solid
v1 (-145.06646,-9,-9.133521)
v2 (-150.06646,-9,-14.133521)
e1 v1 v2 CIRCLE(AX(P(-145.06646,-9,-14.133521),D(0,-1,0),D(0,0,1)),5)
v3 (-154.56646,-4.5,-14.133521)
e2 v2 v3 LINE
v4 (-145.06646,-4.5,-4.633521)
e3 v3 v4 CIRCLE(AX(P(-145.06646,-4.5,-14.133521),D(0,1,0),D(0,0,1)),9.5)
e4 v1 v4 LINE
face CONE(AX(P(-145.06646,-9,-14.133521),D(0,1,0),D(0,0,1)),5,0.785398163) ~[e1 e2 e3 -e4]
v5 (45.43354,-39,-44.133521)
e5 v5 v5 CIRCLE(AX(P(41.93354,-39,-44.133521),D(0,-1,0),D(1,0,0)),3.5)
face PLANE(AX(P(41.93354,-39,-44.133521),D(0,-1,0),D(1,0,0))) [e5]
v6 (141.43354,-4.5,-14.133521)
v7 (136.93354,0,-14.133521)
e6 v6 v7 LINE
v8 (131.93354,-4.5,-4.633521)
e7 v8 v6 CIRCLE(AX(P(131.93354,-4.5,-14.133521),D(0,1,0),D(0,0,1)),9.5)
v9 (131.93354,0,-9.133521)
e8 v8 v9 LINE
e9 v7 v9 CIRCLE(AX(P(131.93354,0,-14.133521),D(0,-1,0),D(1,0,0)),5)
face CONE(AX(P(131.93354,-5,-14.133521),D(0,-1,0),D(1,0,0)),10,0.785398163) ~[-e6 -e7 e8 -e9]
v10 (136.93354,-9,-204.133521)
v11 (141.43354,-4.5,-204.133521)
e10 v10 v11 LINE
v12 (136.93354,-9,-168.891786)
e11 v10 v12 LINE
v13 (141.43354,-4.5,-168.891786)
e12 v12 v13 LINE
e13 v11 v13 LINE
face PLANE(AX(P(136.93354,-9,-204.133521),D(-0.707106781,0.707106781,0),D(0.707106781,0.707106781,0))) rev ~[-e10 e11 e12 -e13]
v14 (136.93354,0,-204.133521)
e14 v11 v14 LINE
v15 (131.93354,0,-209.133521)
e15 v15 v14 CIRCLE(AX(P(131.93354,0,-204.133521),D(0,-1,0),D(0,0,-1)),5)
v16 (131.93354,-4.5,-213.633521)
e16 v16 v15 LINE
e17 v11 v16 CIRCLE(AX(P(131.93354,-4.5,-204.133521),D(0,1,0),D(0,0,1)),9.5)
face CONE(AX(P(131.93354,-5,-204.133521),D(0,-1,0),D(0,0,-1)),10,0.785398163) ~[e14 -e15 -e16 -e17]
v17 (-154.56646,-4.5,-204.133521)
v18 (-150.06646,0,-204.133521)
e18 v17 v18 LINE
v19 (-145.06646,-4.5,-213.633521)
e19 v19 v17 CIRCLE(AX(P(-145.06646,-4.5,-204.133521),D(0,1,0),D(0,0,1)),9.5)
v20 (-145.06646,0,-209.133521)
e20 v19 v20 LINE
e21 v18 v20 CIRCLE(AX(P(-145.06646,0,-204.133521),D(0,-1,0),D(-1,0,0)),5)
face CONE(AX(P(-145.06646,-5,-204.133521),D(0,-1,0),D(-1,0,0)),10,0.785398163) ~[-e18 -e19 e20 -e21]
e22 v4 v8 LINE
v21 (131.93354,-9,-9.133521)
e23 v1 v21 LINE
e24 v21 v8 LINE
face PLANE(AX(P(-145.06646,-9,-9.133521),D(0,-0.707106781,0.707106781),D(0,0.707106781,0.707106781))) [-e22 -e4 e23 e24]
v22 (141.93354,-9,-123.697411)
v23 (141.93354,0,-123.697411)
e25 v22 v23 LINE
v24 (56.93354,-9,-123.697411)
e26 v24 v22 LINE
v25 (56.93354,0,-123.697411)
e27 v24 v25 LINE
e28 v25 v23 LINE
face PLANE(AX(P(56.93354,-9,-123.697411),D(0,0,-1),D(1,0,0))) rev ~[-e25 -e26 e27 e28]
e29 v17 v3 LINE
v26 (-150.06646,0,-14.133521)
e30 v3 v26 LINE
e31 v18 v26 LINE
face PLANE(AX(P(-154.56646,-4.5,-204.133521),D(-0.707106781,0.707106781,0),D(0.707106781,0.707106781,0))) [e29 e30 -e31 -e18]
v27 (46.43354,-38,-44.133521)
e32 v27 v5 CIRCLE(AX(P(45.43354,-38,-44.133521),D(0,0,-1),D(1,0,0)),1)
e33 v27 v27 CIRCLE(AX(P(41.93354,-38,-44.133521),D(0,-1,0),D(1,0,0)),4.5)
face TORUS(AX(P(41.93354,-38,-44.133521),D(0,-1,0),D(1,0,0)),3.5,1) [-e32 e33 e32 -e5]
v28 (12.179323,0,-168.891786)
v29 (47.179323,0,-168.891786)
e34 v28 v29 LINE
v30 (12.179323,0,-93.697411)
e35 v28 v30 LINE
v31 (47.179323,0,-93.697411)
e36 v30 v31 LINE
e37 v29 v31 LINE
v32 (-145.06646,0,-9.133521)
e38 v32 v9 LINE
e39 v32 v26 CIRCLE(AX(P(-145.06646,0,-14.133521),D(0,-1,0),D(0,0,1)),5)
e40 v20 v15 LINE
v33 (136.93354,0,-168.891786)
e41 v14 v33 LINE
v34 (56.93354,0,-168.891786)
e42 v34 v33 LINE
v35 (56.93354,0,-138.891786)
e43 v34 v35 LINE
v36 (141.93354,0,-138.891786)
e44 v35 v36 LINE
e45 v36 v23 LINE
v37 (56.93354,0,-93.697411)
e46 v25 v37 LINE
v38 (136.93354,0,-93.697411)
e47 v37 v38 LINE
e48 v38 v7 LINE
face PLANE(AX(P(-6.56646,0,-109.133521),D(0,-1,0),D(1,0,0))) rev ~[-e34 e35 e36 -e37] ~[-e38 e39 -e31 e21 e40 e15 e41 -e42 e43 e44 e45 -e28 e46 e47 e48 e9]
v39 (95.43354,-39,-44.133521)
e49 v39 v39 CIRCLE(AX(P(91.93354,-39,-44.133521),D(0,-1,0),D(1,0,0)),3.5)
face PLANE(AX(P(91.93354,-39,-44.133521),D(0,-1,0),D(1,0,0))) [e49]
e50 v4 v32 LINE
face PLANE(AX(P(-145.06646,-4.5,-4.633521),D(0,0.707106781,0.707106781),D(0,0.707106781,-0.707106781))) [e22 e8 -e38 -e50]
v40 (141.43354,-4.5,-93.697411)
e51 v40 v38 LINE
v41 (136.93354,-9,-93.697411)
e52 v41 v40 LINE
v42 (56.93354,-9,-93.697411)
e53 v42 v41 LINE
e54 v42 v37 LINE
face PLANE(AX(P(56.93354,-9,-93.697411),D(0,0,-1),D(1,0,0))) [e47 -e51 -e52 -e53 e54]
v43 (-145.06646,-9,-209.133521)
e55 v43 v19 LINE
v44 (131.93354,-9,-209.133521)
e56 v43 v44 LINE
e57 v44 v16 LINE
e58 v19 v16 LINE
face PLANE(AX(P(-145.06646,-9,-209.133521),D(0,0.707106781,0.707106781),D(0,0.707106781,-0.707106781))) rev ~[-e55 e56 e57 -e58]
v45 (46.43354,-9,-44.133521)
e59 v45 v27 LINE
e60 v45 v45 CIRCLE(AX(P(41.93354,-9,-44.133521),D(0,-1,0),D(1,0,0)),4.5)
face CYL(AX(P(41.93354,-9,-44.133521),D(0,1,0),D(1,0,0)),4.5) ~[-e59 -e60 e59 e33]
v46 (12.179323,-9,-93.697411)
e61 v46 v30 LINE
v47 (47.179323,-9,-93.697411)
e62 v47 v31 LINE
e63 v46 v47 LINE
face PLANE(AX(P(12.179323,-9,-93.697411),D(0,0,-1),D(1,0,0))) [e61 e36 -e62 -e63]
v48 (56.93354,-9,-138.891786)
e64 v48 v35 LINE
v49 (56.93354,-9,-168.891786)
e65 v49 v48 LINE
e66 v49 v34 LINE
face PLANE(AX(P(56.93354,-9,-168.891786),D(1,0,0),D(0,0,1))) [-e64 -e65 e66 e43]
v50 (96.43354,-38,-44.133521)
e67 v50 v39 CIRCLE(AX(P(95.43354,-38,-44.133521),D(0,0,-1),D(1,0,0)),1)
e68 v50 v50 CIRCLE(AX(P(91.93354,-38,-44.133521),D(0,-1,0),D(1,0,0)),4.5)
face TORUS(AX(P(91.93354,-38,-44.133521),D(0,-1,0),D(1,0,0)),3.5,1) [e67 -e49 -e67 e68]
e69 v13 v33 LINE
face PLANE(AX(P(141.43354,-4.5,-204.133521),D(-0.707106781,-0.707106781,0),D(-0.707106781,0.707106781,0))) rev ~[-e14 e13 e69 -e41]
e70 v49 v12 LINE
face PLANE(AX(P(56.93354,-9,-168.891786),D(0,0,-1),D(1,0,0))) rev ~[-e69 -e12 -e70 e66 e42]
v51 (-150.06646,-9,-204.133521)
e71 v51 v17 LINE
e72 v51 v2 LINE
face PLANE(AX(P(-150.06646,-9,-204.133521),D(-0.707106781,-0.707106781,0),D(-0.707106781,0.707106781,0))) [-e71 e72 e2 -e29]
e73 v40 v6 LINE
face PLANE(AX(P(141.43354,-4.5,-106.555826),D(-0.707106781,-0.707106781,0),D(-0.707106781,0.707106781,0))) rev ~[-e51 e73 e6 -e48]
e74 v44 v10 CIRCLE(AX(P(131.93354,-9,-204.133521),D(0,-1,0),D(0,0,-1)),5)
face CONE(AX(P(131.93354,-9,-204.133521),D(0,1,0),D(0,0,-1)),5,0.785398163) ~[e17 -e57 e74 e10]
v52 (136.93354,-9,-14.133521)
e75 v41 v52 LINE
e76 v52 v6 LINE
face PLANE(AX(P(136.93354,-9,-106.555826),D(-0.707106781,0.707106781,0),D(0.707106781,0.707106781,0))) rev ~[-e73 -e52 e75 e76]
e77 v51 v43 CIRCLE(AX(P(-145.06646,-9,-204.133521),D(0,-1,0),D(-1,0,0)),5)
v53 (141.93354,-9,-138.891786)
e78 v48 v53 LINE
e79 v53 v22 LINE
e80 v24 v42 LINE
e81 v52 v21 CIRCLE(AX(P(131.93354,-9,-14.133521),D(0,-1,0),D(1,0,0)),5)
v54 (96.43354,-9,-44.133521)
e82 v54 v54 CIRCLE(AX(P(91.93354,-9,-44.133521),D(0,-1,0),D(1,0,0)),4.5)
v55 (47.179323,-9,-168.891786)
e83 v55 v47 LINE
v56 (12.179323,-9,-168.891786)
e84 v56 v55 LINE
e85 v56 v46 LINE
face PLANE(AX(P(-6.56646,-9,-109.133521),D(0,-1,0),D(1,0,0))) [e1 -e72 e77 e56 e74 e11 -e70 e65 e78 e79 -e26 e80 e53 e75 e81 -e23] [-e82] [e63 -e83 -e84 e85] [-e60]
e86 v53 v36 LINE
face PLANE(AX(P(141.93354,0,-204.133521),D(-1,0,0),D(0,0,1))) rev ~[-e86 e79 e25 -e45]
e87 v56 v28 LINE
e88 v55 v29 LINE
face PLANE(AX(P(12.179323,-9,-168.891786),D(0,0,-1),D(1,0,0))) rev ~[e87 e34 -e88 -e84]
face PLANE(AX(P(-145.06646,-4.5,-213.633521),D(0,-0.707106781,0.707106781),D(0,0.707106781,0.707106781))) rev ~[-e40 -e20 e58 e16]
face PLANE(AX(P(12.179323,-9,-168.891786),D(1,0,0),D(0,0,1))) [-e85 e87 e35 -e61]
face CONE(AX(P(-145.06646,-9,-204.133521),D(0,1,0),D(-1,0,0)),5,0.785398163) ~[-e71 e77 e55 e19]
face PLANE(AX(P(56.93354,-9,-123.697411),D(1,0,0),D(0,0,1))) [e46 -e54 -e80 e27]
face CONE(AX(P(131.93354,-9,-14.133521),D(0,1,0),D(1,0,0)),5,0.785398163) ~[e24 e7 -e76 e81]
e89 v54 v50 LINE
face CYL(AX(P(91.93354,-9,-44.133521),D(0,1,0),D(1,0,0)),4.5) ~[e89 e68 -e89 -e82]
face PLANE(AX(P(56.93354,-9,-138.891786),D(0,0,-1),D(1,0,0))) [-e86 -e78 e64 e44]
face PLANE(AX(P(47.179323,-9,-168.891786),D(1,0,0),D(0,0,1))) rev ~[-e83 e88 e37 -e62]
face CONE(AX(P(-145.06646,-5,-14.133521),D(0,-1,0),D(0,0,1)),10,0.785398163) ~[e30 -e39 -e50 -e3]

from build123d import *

# Parameters (mm, degrees)
F1_DEPTH      = 9
F2_R          = 4.5
F3_DEPTH      = 30
F4_W          = 85
F4_H          = 30
F5_DEPTH      = 25
F6_W          = 85
F6_H          = 30
F7_DEPTH      = 25
F9_R          = 1
F10_T1_DEPTH  = 277
F10_T3_DEPTH  = 190
F10_T5_DEPTH  = 48.1001500805
F10_T7_DEPTH  = 92.4223044172
F10_T10_ANGLE = 90
F10_T12_ANGLE = 90
F10_T14_ANGLE = 90
F10_T16_ANGLE = 90
F10_T18_ANGLE = 90
F10_T20_ANGLE = 90
F10_T22_ANGLE = 90
F10_T24_ANGLE = 90
F8_W          = 35
F8_H          = 75.194375382
F11_DEPTH     = 25


# Not quite as in the source:
# - a fillet or chamfer that OpenCascade refuses, or shapes differently, is made with other operations: its cross-section is extruded or revolved along the edge and cut away or added


with BuildPart() as f1:
    # F0 (on Front) → F1 (new body)
    with BuildSketch(Plane.XZ):
        with BuildLine():
            Line((131.9335396439, -4.1335214776), (-145.0664603561, -4.1335214776))
            ThreePointArc((-145.0664603561, -4.1335214776), (-152.137528168, -7.0624536657), (-155.0664603561, -14.1335214776))
            Line((-155.0664603561, -14.1335214776), (-155.0664603561, -204.1335214776))
            ThreePointArc((-155.0664603561, -204.1335214776), (-152.137528168, -211.2045892894), (-145.0664603561, -214.1335214776))
            Line((-145.0664603561, -214.1335214776), (131.9335396439, -214.1335214776))
            ThreePointArc((131.9335396439, -214.1335214776), (139.0046074557, -211.2045892894), (141.9335396439, -204.1335214776))
            Line((141.9335396439, -204.1335214776), (141.9335396439, -14.1335214776))
            ThreePointArc((141.9335396439, -14.1335214776), (139.0046074557, -7.0624536657), (131.9335396439, -4.1335214776))
        make_face()
    extrude(amount=F1_DEPTH)

    # F2 (on face) → F3 (join)
    with BuildSketch(Plane.XZ.offset(9)):
        with Locations((41.9335396439, -44.1335214776)):
            Circle(F2_R)
        with Locations((91.9335396439, -44.1335214776)):
            Circle(F2_R)
    extrude(amount=F3_DEPTH)

    # F4 (on face) → F5 (cut)
    with BuildSketch(Plane.XZ.offset(9)):
        with Locations((99.4335396439, -108.6974109549)):
            Rectangle(F4_W, F4_H)
    extrude(amount=-F5_DEPTH, mode=Mode.SUBTRACT)

    # F6 (on face) → F7 (cut)
    with BuildSketch(Plane.XZ.offset(9)):
        with Locations((99.4335396439, -153.8917863369)):
            Rectangle(F6_W, F6_H)
    extrude(amount=-F7_DEPTH, mode=Mode.SUBTRACT)

    # F9
    f9_edges = [f1.edges().sort_by_distance(p)[0] for p in [
        (37.43354, -39, -44.133521),
        (87.43354, -39, -44.133521),
    ]]
    fillet(f9_edges, radius=F9_R)

    # F10: chamfer of 5 on 2 edges, made by hand

    # F10_s2 → F10_t1 (cut)
    with BuildSketch(Plane.YZ.offset(-145.0664603561)):
        Polygon((-9, -9.1335214776), (-4, -4.1335214776), (-9, -4.1335214776), align=None)
        Polygon((-5, -4.1335214776), (0, -9.1335214776), (0, -4.1335214776), align=None)
        Polygon((-5, -214.1335214776), (0, -209.1335214776), (0, -214.1335214776), align=None)
        Polygon((-9, -209.1335214776), (-4, -214.1335214776), (-9, -214.1335214776), align=None)
    extrude(amount=F10_T1_DEPTH, mode=Mode.SUBTRACT)

    # F10_s4 → F10_t3 (cut)
    with BuildSketch(Plane.XY.offset(-204.1335214776)):
        Polygon((-155.0664603561, -5), (-150.0664603561, 0), (-155.0664603561, 0), align=None)
        Polygon((-150.0664603561, -9), (-155.0664603561, -4), (-155.0664603561, -9), align=None)
    extrude(amount=F10_T3_DEPTH, mode=Mode.SUBTRACT)

    # F10_s6 → F10_t5 (cut)
    with BuildSketch(Plane.XY.offset(-204.1335214776)):
        Polygon((141.9335396439, -5), (136.9335396439, 0), (141.9335396439, 0), align=None)
        Polygon((136.9335396439, -9), (141.9335396439, -4), (141.9335396439, -9), align=None)
    extrude(amount=F10_T5_DEPTH, mode=Mode.SUBTRACT)

    # F10_s8 → F10_t7 (cut)
    with BuildSketch(Plane.XY.offset(-106.5558258947)):
        Polygon((141.9335396439, -5), (136.9335396439, 0), (141.9335396439, 0), align=None)
        Polygon((136.9335396439, -9), (141.9335396439, -4), (141.9335396439, -9), align=None)
    extrude(amount=F10_T7_DEPTH, mode=Mode.SUBTRACT)

    # F10_s9 → F10_t10 (revolve, cut)
    with BuildSketch(Plane.XY.offset(-14.1335214776)):
        Polygon((141.9335396439, -5), (136.9335396439, 0), (141.9335396439, 0), align=None)
    revolve(axis=Axis((131.9335396439, 0, -14.1335214776), (0, -1, 0)), revolution_arc=F10_T10_ANGLE, mode=Mode.SUBTRACT)

    # F10_s11 → F10_t12 (revolve, cut)
    with BuildSketch(Plane.YZ.offset(-145.0664603561)):
        Polygon((-5, -4.1335214776), (0, -9.1335214776), (0, -4.1335214776), align=None)
    revolve(axis=Axis((-145.0664603561, 0, -14.1335214776), (0, -1, 0)), revolution_arc=F10_T12_ANGLE, mode=Mode.SUBTRACT)

    # F10_s13 → F10_t14 (revolve, cut)
    with BuildSketch(Plane.XY.offset(-204.1335214776)):
        Polygon((-155.0664603561, -5), (-150.0664603561, 0), (-155.0664603561, 0), align=None)
    revolve(axis=Axis((-145.0664603561, 0, -204.1335214776), (0, -1, 0)), revolution_arc=F10_T14_ANGLE, mode=Mode.SUBTRACT)

    # F10_s15 → F10_t16 (revolve, cut)
    with BuildSketch(Plane.YZ.offset(131.9335396439)):
        Polygon((-5, -214.1335214776), (0, -209.1335214776), (0, -214.1335214776), align=None)
    revolve(axis=Axis((131.9335396439, 0, -204.1335214776), (0, -1, 0)), revolution_arc=F10_T16_ANGLE, mode=Mode.SUBTRACT)

    # F10_s17 → F10_t18 (revolve, cut)
    with BuildSketch(Plane.XY.offset(-14.1335214776)):
        Polygon((136.9335396439, -9), (141.9335396439, -4), (141.9335396439, -9), align=None)
    revolve(axis=Axis((131.9335396439, -9, -14.1335214776), (0, -1, 0)), revolution_arc=F10_T18_ANGLE, mode=Mode.SUBTRACT)

    # F10_s19 → F10_t20 (revolve, cut)
    with BuildSketch(Plane.YZ.offset(-145.0664603561)):
        Polygon((-9, -9.1335214776), (-4, -4.1335214776), (-9, -4.1335214776), align=None)
    revolve(axis=Axis((-145.0664603561, -9, -14.1335214776), (0, -1, 0)), revolution_arc=F10_T20_ANGLE, mode=Mode.SUBTRACT)

    # F10_s21 → F10_t22 (revolve, cut)
    with BuildSketch(Plane.XY.offset(-204.1335214776)):
        Polygon((-150.0664603561, -9), (-155.0664603561, -4), (-155.0664603561, -9), align=None)
    revolve(axis=Axis((-145.0664603561, -9, -204.1335214776), (0, -1, 0)), revolution_arc=F10_T22_ANGLE, mode=Mode.SUBTRACT)

    # F10_s23 → F10_t24 (revolve, cut)
    with BuildSketch(Plane.YZ.offset(131.9335396439)):
        Polygon((-9, -209.1335214776), (-4, -214.1335214776), (-9, -214.1335214776), align=None)
    revolve(axis=Axis((131.9335396439, -9, -204.1335214776), (0, -1, 0)), revolution_arc=F10_T24_ANGLE, mode=Mode.SUBTRACT)

    # F8 (on face) → F11 (cut)
    with BuildSketch(Plane.XZ.offset(9)):
        with Locations((29.6793225408, -131.2945986459)):
            Rectangle(F8_W, F8_H)
    extrude(amount=-F11_DEPTH, mode=Mode.SUBTRACT)


solid = f1.part
